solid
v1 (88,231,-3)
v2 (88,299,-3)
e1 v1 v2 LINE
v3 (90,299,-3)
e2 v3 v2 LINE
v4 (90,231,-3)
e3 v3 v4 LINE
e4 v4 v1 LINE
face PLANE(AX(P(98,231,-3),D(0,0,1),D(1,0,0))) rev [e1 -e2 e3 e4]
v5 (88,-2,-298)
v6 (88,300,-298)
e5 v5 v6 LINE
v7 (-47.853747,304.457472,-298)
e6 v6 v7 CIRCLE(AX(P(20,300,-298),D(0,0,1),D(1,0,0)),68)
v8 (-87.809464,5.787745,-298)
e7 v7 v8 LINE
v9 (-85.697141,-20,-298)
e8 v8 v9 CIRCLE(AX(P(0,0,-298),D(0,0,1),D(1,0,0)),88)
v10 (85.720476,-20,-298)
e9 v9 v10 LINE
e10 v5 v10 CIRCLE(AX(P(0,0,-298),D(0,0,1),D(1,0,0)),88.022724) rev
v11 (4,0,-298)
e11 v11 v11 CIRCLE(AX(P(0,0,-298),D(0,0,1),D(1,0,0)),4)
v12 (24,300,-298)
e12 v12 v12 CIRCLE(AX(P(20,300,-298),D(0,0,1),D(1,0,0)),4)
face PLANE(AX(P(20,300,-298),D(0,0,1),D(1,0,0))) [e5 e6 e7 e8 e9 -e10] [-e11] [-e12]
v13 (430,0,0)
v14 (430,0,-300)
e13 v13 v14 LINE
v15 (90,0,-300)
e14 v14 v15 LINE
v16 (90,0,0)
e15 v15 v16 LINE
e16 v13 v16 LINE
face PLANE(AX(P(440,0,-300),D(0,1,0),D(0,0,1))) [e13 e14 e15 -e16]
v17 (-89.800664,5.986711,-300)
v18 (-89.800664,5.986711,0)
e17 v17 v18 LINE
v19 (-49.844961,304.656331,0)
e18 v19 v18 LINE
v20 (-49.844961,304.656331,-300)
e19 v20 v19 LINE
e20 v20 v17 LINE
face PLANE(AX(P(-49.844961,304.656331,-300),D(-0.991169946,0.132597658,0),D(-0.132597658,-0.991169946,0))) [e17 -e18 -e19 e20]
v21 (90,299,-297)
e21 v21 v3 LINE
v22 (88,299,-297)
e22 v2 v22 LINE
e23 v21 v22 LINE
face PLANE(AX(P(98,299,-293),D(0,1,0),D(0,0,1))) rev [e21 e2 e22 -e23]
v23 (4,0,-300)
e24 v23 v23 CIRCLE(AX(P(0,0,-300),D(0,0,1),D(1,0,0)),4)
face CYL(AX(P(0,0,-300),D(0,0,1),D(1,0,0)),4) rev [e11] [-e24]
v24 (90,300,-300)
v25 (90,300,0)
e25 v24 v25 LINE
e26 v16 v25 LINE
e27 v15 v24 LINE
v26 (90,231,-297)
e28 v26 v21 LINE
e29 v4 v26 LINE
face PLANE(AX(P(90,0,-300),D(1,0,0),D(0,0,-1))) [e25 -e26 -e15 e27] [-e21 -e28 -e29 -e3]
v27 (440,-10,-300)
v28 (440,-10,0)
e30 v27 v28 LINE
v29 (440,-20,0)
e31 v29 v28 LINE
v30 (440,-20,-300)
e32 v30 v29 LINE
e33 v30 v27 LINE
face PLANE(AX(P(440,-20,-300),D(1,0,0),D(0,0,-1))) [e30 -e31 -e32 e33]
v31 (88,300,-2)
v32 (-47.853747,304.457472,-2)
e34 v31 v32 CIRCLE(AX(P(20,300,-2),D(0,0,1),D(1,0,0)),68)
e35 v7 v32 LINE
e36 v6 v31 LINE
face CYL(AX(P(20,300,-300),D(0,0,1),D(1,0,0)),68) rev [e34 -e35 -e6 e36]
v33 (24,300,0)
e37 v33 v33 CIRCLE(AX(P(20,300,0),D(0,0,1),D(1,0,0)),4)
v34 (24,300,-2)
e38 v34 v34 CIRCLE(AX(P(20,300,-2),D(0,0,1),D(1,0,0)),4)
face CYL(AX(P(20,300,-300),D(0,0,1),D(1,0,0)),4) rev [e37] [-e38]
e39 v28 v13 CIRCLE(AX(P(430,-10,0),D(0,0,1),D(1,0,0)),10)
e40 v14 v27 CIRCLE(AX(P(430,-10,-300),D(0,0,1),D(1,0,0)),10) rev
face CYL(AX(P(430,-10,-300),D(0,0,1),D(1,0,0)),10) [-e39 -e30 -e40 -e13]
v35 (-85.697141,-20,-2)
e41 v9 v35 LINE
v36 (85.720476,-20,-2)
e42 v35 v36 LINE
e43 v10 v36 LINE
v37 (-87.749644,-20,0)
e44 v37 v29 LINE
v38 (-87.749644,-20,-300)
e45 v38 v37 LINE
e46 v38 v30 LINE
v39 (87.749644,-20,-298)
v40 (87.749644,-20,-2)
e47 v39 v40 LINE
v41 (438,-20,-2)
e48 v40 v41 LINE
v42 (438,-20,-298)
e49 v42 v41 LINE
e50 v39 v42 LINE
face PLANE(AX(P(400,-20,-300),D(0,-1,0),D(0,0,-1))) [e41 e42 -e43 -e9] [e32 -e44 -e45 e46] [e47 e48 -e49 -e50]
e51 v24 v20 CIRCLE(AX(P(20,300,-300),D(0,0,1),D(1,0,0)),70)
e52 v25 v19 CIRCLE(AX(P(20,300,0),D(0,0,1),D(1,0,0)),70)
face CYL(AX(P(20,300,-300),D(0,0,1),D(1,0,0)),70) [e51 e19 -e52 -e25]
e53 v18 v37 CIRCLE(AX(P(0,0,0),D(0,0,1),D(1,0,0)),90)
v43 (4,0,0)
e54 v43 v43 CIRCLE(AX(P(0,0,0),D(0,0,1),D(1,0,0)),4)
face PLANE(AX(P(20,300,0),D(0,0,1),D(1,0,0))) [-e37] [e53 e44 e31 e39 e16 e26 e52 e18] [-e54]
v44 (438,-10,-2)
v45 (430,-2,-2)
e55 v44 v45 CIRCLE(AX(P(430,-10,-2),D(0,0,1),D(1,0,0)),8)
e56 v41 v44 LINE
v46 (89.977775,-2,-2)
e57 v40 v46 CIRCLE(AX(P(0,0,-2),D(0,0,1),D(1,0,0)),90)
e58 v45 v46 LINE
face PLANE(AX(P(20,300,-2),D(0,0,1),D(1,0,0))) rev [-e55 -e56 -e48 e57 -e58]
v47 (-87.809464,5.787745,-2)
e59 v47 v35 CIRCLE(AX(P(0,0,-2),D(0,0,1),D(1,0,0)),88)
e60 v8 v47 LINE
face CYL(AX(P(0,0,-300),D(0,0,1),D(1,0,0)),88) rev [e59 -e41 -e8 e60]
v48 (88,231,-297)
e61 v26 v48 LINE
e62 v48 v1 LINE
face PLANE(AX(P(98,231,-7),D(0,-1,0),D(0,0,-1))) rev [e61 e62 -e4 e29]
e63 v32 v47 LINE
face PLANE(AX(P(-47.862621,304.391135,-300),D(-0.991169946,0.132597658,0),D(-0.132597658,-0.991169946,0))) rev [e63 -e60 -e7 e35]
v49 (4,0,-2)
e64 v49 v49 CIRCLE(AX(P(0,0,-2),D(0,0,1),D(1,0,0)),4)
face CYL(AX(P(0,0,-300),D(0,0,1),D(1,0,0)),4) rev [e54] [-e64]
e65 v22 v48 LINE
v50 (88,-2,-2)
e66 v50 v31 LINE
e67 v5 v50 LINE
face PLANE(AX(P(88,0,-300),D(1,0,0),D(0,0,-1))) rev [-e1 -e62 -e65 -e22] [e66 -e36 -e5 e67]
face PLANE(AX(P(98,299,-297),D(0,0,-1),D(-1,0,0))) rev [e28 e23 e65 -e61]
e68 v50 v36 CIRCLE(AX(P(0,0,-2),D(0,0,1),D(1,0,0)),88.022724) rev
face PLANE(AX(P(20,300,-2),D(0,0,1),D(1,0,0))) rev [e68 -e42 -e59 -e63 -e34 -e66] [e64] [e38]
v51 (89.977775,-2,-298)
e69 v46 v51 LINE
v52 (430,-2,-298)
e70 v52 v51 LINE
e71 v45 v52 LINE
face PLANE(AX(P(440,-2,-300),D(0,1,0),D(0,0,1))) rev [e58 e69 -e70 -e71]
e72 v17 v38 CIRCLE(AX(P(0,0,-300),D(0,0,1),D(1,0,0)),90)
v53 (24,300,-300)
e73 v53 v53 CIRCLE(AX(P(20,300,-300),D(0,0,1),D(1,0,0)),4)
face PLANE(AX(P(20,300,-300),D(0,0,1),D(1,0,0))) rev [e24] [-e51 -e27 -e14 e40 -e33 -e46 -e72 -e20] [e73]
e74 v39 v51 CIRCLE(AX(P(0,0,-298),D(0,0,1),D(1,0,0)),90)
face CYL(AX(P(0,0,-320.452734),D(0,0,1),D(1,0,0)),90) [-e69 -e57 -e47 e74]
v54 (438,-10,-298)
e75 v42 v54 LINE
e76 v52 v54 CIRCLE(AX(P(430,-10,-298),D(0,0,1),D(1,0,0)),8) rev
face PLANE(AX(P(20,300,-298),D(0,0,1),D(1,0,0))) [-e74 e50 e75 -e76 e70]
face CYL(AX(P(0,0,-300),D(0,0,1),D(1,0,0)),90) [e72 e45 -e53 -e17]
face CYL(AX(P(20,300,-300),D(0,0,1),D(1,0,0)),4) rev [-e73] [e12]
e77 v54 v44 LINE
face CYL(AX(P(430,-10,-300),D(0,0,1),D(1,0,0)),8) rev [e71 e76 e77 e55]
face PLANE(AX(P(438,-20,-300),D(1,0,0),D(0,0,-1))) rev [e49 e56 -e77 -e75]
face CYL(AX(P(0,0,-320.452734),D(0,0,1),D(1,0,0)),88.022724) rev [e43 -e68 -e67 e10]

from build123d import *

# Parameters (mm, degrees)
EXTRUDE_1_DEPTH      = 300
FILLET_1_R           = 10
SHELL_START          = -298
SHELL_1_DEPTH        = 296
SKETCH_2_R           = 4
CUT_EXTRUDE_1_DEPTH  = 649.459713475
EXTRUDE_2_DEPTH      = 300
CUT_EXTRUDE_12_DEPTH = 10


# Read off the part's stored shape, not the designer's step: 抽壳1
with BuildPart() as part:
    # 草图1 → 凸台-拉伸1 (new body)
    with BuildSketch(Plane.XY):
        with BuildLine():
            Line((440, -20), (440, 0))
            Line((440, 0), (90, 0))
            Line((90, 0), (90, 300))
            ThreePointArc((90, 300), (22.32945557, 369.961229526), (-49.84496105, 304.656330737))
            Line((-49.84496105, 304.656330737), (-89.800664207, 5.986710947))
            ThreePointArc((-89.800664207, 5.986710947), (-89.720985624, -7.081294982), (-87.749643874, -20))
            Line((-87.749643874, -20), (0, -20))
            Line((0, -20), (400, -20))
            Line((400, -20), (440, -20))
        make_face()
    extrude(amount=-EXTRUDE_1_DEPTH)

    # 圆角1
    fillet_1_edges = [part.edges().sort_by_distance(p)[0] for p in [
        (440, 0, -150),
    ]]
    fillet(fillet_1_edges, radius=FILLET_1_R)

    # 抽壳1 outline → 抽壳1 (cut)
    with BuildSketch(Plane.XY.offset(SHELL_START)):
        with BuildLine():
            Line((88, -2), (88, 300))
            ThreePointArc((88, 300), (22.229935395, 367.963426842), (-47.85374671, 304.45747209))
            Line((-47.85374671, 304.45747209), (-87.809464232, 5.787744921))
            ThreePointArc((-87.809464232, 5.787744921), (-87.706256756, -7.184185814), (-85.697141143, -20))
            Line((-85.697141143, -20), (438, -20))
            Line((438, -20), (438, -10))
            ThreePointArc((438, -10), (435.656854249, -4.343145751), (430, -2))
            Line((430, -2), (88, -2))
        make_face()
    extrude(amount=SHELL_1_DEPTH, mode=Mode.SUBTRACT)

    # 草图2 → 切除-拉伸1 (cut, through all)
    with BuildSketch(Plane.XY):
        Circle(SKETCH_2_R)
        with Locations((20, 300)):
            Circle(SKETCH_2_R)
    extrude(amount=-CUT_EXTRUDE_1_DEPTH, mode=Mode.SUBTRACT)

    # 草图3 → 凸台-拉伸2 (add)
    with BuildSketch(Plane.XY):
        with BuildLine():
            Line((88.022724339, 0), (90, 0))
            ThreePointArc((90, 0), (89.435641521, -10.063102189), (87.749643874, -20))
            Line((87.749643874, -20), (85.720475967, -20))
            ThreePointArc((85.720475967, -20), (87.4452681, -10.066036305), (88.022724339, 0))
        make_face()
    extrude(amount=-EXTRUDE_2_DEPTH)

    # 草图4 → 切除-拉伸12 (cut)
    with BuildSketch(Plane.ZY.offset(-88)):
        Polygon((-7, 231), (-3, 231), (-3, 299), (-7, 299), (-293, 299), (-297, 299), (-297, 231), align=None)
    extrude(amount=-CUT_EXTRUDE_12_DEPTH, mode=Mode.SUBTRACT)


solid = part.part
